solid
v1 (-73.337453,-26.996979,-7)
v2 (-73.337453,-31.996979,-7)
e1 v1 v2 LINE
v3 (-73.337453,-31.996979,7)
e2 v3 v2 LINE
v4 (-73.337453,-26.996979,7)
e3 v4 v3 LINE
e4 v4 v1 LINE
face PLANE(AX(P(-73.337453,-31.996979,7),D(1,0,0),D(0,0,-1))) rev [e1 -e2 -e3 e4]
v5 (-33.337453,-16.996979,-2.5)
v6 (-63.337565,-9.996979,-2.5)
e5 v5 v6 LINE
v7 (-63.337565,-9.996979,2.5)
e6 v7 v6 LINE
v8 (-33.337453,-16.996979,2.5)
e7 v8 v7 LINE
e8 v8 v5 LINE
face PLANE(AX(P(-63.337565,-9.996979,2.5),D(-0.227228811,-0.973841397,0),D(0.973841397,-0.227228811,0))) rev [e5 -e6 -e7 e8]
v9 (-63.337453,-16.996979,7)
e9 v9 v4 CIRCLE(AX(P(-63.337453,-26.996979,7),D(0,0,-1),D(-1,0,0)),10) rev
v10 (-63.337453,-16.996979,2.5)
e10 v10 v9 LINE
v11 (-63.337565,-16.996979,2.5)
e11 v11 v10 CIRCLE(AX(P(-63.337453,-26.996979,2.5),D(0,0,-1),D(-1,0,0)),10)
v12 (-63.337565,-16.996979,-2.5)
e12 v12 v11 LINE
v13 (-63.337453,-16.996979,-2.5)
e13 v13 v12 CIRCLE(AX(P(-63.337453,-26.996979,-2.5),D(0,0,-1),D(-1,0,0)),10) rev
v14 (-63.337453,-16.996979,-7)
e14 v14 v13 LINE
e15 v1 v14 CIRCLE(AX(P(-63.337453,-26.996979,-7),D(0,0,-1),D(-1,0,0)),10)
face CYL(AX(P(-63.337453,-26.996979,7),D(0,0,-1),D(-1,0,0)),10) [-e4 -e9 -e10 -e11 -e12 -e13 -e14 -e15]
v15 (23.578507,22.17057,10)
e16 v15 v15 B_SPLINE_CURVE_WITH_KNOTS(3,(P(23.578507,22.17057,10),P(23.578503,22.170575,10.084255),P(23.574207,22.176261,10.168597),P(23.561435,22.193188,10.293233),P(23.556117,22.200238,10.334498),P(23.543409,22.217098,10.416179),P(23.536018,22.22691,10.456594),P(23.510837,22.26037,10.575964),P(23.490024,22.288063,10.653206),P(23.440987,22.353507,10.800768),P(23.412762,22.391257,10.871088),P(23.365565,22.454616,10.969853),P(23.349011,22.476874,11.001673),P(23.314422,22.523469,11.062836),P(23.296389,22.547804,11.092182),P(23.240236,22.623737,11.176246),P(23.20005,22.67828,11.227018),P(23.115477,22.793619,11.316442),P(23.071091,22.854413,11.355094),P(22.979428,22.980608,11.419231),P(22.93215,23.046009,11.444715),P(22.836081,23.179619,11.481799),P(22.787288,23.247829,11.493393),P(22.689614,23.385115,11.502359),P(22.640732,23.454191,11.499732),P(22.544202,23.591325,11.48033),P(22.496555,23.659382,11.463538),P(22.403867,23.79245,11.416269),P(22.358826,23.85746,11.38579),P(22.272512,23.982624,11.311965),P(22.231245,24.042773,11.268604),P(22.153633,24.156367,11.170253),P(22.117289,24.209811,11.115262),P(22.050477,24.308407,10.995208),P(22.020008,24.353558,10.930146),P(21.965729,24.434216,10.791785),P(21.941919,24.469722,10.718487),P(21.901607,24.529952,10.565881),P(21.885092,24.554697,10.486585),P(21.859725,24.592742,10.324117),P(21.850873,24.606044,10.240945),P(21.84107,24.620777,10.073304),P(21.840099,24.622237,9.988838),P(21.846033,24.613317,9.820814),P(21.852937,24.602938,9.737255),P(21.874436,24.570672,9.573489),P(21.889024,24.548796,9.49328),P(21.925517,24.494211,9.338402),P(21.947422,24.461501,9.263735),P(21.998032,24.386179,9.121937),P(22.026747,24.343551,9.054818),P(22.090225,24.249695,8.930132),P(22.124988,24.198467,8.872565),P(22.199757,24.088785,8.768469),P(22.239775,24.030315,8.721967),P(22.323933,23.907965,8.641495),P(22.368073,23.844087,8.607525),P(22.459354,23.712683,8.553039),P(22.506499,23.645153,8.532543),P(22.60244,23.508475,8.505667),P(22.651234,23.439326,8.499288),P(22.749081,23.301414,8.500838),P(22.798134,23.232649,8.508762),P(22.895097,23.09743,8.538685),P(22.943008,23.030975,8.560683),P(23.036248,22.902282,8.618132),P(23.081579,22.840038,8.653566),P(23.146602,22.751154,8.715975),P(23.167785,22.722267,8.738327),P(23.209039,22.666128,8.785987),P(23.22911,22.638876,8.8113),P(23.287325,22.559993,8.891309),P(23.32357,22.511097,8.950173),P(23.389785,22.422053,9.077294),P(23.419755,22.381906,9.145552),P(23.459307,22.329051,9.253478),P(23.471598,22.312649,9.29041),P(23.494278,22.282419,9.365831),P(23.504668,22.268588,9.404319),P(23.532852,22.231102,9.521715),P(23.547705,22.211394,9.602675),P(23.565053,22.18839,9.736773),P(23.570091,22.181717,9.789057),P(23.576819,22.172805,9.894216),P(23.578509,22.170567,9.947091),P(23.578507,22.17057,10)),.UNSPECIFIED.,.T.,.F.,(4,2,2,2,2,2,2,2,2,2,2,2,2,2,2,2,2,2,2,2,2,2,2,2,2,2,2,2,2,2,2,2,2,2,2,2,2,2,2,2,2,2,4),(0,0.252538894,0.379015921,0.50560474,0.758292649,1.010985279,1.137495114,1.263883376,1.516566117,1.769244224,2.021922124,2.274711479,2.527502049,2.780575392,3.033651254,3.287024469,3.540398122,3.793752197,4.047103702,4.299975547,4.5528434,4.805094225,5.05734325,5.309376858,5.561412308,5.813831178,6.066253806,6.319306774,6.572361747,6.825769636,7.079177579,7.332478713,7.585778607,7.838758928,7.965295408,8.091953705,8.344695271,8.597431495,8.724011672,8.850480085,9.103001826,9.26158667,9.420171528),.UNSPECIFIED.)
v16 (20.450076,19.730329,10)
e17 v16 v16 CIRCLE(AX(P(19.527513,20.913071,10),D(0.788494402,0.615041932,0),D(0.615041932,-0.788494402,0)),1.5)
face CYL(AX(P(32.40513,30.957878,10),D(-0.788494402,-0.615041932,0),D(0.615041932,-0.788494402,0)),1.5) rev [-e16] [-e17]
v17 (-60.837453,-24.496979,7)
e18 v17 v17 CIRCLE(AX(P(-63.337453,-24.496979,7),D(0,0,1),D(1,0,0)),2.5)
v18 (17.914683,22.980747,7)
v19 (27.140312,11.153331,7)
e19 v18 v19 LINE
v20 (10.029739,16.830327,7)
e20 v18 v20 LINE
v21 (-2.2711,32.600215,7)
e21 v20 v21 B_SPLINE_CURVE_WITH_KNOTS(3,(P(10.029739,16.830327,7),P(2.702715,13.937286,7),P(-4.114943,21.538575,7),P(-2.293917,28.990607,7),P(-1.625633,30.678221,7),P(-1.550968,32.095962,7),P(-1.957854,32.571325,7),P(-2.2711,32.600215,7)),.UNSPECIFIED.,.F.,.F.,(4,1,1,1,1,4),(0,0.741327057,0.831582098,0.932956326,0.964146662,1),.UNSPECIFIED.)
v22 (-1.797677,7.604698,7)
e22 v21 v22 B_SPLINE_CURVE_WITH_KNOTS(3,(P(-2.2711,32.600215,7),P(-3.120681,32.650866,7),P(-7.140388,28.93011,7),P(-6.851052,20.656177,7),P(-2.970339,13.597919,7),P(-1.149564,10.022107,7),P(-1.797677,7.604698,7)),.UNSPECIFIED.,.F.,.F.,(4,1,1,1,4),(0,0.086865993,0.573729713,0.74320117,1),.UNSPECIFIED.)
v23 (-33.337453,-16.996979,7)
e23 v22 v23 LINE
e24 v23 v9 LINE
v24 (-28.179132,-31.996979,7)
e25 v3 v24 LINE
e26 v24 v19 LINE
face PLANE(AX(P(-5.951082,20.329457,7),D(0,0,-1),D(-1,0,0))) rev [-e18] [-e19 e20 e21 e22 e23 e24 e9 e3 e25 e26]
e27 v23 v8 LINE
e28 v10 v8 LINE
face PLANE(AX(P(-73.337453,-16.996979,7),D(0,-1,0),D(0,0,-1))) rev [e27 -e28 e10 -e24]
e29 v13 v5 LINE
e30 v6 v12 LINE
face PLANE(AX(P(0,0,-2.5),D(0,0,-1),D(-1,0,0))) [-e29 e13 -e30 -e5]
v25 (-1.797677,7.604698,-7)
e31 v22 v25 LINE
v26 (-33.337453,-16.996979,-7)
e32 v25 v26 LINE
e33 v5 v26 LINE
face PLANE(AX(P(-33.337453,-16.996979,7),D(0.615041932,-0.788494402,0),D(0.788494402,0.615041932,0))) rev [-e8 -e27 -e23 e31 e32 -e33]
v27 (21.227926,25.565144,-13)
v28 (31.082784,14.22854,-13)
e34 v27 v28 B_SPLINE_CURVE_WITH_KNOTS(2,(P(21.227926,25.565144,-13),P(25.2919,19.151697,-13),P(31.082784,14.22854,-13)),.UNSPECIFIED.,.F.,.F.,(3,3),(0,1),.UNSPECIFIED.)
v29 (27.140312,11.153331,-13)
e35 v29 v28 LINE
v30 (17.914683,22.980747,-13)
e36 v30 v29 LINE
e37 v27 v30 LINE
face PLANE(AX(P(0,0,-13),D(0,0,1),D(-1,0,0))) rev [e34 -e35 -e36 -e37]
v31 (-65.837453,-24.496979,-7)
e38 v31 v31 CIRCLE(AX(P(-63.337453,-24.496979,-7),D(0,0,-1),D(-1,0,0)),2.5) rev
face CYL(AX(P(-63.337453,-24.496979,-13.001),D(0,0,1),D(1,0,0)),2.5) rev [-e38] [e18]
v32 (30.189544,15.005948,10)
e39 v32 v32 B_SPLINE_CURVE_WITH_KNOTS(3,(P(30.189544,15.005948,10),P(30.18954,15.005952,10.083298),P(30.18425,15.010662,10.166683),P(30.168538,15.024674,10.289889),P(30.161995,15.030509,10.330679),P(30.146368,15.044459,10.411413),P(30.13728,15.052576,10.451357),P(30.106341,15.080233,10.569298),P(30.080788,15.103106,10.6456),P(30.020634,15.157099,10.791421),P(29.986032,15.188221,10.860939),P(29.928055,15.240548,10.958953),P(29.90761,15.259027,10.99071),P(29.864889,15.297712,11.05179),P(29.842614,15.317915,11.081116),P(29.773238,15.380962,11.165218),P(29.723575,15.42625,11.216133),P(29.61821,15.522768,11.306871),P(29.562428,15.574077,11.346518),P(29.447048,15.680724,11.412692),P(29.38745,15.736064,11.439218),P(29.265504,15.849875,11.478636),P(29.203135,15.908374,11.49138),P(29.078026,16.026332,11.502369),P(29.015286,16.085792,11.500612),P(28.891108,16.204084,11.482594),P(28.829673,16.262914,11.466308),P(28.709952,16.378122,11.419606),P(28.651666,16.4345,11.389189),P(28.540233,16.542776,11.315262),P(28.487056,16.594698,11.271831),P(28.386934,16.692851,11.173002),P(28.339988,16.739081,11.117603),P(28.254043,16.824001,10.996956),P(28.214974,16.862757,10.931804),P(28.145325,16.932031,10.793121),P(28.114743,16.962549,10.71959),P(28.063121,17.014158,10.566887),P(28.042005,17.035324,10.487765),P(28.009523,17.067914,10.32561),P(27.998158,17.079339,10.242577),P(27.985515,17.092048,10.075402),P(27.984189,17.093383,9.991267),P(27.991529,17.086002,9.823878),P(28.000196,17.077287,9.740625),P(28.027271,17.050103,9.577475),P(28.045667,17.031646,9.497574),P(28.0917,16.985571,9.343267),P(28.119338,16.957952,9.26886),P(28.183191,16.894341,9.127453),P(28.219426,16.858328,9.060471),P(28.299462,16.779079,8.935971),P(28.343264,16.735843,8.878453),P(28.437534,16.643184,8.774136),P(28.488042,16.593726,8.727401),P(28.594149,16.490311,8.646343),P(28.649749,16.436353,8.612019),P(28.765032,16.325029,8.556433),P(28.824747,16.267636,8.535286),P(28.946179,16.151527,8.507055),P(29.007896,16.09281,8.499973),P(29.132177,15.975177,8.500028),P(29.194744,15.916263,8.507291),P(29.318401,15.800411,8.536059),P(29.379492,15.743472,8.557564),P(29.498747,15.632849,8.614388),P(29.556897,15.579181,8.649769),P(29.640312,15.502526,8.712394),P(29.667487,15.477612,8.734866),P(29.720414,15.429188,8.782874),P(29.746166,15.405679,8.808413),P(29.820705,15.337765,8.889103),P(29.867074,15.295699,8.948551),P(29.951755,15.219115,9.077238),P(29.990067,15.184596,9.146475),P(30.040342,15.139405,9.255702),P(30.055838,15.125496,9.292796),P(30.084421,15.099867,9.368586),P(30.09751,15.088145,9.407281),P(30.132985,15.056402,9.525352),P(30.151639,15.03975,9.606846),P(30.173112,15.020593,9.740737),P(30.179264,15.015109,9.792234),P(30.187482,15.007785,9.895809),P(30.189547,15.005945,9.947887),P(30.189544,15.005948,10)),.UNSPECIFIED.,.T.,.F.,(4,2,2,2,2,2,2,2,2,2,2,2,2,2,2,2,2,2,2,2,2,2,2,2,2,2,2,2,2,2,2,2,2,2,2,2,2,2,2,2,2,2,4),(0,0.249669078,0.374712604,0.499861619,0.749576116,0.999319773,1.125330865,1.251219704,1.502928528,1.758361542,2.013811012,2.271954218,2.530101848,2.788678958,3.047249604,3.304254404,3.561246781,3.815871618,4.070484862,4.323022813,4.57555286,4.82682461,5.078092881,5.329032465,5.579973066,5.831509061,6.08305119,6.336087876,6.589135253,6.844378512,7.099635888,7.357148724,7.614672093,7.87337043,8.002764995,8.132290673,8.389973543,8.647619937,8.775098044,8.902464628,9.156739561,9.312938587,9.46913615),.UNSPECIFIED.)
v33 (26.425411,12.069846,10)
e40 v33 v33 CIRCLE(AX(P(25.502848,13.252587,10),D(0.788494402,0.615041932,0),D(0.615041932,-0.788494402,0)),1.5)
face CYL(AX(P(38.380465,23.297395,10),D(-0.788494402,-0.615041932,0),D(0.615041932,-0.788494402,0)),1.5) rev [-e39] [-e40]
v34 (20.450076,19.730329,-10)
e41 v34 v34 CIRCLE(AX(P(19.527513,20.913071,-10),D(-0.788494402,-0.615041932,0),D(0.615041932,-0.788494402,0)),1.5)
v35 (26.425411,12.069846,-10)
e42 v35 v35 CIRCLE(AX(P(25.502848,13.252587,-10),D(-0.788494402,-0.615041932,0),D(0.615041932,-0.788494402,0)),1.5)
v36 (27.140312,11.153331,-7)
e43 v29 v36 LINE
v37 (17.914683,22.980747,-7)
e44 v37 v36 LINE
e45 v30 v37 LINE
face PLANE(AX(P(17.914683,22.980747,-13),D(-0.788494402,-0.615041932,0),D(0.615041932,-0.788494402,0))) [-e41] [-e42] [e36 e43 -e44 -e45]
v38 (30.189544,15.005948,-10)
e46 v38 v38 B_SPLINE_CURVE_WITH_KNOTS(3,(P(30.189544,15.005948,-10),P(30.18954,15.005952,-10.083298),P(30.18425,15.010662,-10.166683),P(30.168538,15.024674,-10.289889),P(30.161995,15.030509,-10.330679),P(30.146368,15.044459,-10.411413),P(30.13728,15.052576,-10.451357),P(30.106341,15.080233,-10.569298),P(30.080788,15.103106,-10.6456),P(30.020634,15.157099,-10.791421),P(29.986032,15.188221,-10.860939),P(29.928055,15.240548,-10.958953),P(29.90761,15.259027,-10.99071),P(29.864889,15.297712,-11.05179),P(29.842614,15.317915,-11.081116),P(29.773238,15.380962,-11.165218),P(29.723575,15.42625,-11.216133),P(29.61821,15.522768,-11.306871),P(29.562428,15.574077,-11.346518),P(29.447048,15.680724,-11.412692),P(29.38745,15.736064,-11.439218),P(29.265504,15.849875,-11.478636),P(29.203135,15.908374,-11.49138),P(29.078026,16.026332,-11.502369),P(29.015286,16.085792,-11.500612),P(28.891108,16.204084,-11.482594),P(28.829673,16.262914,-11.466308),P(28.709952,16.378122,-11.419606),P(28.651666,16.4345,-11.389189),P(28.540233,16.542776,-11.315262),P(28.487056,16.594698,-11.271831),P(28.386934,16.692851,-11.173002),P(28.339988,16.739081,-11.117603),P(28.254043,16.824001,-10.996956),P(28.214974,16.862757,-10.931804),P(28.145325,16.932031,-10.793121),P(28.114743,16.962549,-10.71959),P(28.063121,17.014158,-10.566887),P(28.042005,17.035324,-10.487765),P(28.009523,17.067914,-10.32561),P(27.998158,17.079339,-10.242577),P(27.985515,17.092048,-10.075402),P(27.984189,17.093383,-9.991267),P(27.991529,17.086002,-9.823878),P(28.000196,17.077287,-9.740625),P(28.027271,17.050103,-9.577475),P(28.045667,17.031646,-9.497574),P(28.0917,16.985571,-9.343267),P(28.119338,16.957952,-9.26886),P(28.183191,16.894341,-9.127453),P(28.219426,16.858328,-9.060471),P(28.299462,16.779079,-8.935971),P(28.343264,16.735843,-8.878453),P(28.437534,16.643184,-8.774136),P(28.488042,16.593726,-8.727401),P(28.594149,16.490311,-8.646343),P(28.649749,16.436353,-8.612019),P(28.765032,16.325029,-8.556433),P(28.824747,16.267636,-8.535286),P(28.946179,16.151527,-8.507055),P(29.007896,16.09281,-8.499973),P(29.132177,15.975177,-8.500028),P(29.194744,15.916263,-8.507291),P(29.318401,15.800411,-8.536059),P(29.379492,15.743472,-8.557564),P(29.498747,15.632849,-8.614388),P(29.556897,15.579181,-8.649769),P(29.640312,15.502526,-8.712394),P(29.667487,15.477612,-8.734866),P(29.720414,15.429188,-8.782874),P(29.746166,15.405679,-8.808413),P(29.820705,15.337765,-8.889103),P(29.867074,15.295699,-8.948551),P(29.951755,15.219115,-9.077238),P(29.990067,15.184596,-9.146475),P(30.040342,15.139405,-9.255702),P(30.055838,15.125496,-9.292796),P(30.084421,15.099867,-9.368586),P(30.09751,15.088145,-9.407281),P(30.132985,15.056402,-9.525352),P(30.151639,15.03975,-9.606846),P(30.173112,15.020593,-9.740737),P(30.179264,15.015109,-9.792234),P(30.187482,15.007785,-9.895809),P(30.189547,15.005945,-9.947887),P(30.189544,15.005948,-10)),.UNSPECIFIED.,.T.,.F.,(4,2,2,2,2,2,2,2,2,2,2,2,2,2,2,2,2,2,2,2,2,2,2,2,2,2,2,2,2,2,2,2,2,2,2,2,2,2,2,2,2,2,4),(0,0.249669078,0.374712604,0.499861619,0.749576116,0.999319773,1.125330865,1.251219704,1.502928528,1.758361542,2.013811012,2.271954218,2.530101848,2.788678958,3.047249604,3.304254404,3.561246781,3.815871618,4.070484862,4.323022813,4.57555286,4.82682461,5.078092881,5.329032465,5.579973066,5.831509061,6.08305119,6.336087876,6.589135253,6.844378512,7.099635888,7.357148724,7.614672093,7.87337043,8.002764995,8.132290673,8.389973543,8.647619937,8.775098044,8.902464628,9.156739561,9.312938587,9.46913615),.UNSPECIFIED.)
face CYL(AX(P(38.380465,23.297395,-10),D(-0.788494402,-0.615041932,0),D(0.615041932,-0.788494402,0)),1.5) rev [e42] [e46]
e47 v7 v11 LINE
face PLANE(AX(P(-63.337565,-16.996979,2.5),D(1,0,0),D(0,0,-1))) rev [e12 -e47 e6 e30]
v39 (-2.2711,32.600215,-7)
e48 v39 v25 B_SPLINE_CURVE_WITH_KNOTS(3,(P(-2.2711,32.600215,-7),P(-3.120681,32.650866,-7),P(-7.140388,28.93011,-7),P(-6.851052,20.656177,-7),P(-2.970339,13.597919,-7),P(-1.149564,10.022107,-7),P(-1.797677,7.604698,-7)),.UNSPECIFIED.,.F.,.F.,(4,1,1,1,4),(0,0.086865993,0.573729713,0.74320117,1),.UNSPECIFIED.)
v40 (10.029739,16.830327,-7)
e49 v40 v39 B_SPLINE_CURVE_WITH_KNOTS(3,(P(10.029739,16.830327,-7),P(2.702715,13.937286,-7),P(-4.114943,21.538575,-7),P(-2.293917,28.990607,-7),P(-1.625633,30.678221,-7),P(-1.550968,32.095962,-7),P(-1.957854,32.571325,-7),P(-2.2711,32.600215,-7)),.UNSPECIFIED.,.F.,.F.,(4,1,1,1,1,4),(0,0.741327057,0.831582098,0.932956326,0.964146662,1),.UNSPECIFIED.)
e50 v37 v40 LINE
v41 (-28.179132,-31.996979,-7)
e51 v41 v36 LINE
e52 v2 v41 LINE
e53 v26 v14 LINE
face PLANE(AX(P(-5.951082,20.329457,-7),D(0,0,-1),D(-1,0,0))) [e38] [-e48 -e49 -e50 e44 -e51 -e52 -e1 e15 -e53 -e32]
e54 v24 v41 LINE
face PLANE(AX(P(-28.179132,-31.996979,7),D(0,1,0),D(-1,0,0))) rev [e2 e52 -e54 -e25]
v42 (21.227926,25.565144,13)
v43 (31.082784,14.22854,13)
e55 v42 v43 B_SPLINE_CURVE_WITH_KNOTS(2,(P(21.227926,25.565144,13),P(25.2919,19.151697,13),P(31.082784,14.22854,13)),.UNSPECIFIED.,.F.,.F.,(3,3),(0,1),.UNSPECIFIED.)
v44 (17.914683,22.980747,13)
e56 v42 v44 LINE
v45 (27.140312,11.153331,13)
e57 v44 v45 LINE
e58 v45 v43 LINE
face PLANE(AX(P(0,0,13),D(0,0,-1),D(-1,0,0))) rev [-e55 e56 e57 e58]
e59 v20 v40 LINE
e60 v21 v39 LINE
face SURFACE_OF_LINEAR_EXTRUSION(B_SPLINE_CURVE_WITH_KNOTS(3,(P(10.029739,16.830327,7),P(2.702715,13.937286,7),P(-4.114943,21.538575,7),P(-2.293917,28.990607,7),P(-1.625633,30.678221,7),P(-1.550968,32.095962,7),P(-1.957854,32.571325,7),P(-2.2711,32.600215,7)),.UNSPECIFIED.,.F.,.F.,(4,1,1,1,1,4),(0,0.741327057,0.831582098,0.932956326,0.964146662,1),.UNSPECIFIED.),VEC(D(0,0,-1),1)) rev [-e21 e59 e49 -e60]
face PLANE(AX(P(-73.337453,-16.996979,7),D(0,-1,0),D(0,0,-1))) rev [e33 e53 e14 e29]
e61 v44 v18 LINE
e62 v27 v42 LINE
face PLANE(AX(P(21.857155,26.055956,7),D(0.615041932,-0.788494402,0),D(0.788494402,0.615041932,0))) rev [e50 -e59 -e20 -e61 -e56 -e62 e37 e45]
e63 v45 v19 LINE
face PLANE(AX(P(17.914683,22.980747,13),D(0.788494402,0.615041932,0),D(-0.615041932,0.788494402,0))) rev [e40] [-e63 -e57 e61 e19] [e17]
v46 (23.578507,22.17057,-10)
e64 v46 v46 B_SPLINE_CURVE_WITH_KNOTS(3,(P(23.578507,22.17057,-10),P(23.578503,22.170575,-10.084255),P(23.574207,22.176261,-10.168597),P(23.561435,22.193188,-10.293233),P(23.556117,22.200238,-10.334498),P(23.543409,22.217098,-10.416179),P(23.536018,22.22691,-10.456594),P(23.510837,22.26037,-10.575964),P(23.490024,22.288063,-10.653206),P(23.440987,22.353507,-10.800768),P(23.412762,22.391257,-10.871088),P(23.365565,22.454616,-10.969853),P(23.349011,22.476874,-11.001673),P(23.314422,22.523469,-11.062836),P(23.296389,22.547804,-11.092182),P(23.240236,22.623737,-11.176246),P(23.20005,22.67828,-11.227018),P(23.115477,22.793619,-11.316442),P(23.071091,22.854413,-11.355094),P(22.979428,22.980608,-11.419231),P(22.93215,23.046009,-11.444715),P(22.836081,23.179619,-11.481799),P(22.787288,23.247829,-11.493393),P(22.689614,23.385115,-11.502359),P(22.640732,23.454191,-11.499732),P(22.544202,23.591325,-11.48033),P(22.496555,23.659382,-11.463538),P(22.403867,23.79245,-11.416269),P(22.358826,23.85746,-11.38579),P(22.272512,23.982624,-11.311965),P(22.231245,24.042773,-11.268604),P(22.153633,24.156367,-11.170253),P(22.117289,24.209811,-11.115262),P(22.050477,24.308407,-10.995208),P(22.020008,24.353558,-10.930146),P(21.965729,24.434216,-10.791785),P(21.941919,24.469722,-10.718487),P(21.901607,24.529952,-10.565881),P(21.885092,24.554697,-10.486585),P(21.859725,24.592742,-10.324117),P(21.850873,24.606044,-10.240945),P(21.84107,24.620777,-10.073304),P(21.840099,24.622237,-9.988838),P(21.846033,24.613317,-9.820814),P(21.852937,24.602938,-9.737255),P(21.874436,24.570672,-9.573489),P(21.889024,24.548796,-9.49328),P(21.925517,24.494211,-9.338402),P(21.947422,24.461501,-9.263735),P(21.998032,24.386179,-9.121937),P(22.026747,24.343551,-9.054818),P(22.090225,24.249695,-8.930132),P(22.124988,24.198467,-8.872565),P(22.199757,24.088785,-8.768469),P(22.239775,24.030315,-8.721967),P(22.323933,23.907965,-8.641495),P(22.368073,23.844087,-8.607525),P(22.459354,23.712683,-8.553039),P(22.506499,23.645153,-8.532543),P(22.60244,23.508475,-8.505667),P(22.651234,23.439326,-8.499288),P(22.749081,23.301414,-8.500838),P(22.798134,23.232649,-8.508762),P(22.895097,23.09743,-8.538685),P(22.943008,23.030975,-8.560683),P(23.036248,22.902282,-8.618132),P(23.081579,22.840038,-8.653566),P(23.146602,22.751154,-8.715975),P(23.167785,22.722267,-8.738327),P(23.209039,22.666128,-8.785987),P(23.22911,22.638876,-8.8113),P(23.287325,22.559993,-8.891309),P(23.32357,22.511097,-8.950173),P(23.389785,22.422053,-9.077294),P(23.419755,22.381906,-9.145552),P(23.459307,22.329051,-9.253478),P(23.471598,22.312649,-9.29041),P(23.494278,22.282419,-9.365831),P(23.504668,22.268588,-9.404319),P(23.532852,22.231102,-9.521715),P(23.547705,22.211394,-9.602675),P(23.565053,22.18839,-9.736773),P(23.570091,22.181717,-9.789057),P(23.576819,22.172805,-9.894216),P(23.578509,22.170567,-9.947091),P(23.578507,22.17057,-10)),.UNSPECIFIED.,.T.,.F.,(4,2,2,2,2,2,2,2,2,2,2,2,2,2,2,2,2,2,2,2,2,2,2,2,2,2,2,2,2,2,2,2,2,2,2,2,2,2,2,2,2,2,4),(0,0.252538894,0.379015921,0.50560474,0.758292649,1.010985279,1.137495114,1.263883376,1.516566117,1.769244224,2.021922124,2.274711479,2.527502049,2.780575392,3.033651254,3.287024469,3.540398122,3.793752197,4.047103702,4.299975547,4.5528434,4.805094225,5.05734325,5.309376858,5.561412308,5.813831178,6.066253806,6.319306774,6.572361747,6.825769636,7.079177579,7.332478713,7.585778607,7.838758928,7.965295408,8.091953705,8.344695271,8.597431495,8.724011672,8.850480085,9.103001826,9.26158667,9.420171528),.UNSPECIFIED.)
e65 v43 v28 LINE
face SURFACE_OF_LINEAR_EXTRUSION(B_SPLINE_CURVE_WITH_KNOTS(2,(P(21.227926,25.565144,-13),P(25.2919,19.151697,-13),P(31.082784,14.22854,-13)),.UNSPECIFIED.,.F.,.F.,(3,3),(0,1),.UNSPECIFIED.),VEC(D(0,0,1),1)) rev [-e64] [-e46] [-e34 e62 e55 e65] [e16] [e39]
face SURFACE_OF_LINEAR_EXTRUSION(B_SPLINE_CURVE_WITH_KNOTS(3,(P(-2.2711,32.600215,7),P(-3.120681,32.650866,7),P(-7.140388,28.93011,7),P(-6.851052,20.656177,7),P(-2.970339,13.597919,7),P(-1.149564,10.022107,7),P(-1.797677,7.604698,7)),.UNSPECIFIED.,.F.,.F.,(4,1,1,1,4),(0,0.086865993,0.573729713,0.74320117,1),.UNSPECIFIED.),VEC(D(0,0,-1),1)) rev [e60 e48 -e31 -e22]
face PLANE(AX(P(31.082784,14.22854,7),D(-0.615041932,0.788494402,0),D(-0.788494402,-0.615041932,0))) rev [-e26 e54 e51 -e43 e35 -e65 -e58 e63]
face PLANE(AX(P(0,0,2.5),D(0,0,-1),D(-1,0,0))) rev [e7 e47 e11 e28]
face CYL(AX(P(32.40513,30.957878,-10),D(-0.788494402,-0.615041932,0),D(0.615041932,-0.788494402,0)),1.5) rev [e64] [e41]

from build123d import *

# Parameters (mm, degrees)
SALIENTE_EXTRUIR1_DEPTH = 7
CROQUIS2_R              = 2.5
CORTAR_EXTRUIR1_DEPTH   = 40
SALIENTE_EXTRUIR2_DEPTH = 6
CORTAR_EXTRUIR2_DEPTH   = 85.364465566
CROQUIS6_R              = 1.5
CORTAR_EXTRUIR3_DEPTH   = 109.399183933
SALIENTE_EXTRUIR3_DEPTH = 2.5
CORTAR_EXTRUIR4_REACH   = 110.399
CROQUIS8_R              = 1.5
CORTAR_EXTRUIR5_REACH   = 84.713
CROQUIS9_R              = 2.5
REDONDEO1_R             = 10


with BuildPart() as part:
    # Croquis1 → Saliente-Extruir1 (new, symmetric)
    with BuildSketch(Plane.XY):
        with BuildLine():
            Line((-73.337453264, -31.996979), (-73.337453264, -16.996979))
            Line((-73.337453264, -16.996979), (-53.337453264, -16.996979))
            Line((-53.337453264, -16.996979), (-33.337453264, -16.996979))
            Line((-33.337453264, -16.996979), (-1.797677202, 7.604698299))
            add(Edge.make_bspline(
                [(-2.271099828, 32.600215317), (-3.120681365, 32.65086638), (-7.140387905, 28.930110418), (-6.851052057, 20.6561771), (-2.970338985, 13.597919356), (-1.149563969, 10.022107474), (-1.797677202, 7.604698299)],
                knots=[0, 0, 0, 0, 0.086865993, 0.573729713, 0.74320117, 1, 1, 1, 1], degree=3))
            add(Edge.make_bspline(
                [(-2.271099828, 32.600215317), (-1.957854214, 32.571324686), (-1.550967765, 32.095962064), (-1.625633045, 30.678221383), (-2.293917384, 28.99060688), (-4.114943029, 21.538574705), (2.702714569, 13.937286445), (10.029738822, 16.830327286)],
                knots=[0, 0, 0, 0, 0.035853338, 0.067043674, 0.168417902, 0.258672943, 1, 1, 1, 1], degree=3))
            Line((10.029738822, 16.830327286), (21.857154848, 26.05595627))
            Line((21.857154848, 26.05595627), (31.082783835, 14.228540246))
            Line((31.082783835, 14.228540246), (-28.179131834, -31.996979))
            Line((-28.179131834, -31.996979), (-73.337453264, -31.996979))
        make_face()
    extrude(amount=SALIENTE_EXTRUIR1_DEPTH, both=True)

    # Croquis2 → Cortar-Extruir1 (cut)
    with BuildSketch(Plane.XY.offset(7)):
        with Locations((-63.337453264, -12.196140351)):
            Circle(CROQUIS2_R)
    extrude(amount=-CORTAR_EXTRUIR1_DEPTH, mode=Mode.SUBTRACT)

    # Croquis4 → Saliente-Extruir2 (add)
    with BuildSketch(Plane.XY.offset(7)):
        Polygon((21.857154848, 26.05595627), (17.914682839, 22.980746608), (27.140311824, 11.153330581), (31.082783835, 14.228540246), align=None)
    saliente_extruir2 = extrude(amount=SALIENTE_EXTRUIR2_DEPTH)

    # Simetría1: Saliente-Extruir2 across plane
    add(saliente_extruir2.mirror(Plane.XY))

    # Croquis5 → Cortar-Extruir2 (cut, through all)
    with BuildSketch(Plane.XY.offset(13)):
        with BuildLine():
            Line((21.227925662, 25.565144498), (21.857154848, 26.05595627))
            Line((21.857154848, 26.05595627), (31.082783835, 14.228540246))
            add(Edge.make_bspline(
                [(31.082783835, 14.228540246), (25.291900343, 19.151696697), (21.227925662, 25.565144498)],
                knots=[0, 0, 0, 1, 1, 1], degree=2))
        make_face()
    extrude(amount=-CORTAR_EXTRUIR2_DEPTH, mode=Mode.SUBTRACT)

    # Croquis6 → Cortar-Extruir3 (cut, through all)
    with BuildSketch(Plane(origin=(22.282654611, 17.3809312, 0), x_dir=(0, 0, 1), z_dir=(-0.7884944017253559, -0.6150419322678522, 0))):
        with Locations((-20.725956244, 4.101908899)):
            Circle(CROQUIS6_R)
        with Locations((-20.725956244, -4.898091102)):
            Circle(CROQUIS6_R)
    cortar_extruir3 = extrude(amount=-CORTAR_EXTRUIR3_DEPTH, mode=Mode.SUBTRACT)

    # Simetría2: Cortar-Extruir3 across plane
    add(cortar_extruir3.mirror(Plane.XY), mode=Mode.SUBTRACT)

    # Croquis7 → Saliente-Extruir3 (add, symmetric)
    with BuildSketch(Plane.XY):
        Polygon((-33.337453264, -16.996979), (-47.567565233, -16.996979), (-63.337565233, -16.996979), (-63.337565233, -9.996979), align=None)
    extrude(amount=SALIENTE_EXTRUIR3_DEPTH, both=True)

    # Croquis8 → Cortar-Extruir4 (cut, up to next)
    with BuildSketch(Plane(origin=(22.282654611, 17.3809312, 0), x_dir=(0, 0, 1), z_dir=(-0.7884944017253558, -0.6150419322678521, 0)), mode=Mode.PRIVATE) as cortar_extruir4_sk1:
        with Locations(Location((-10, 4.479600053, 0), (0, 0, 270))):
            Circle(CROQUIS8_R)
    cortar_extruir4_tool1 = extrude(cortar_extruir4_sk1.sketch, amount=-CORTAR_EXTRUIR4_REACH, mode=Mode.PRIVATE) & part.part
    # Croquis8 → Cortar-Extruir4 (cut, up to next)
    with BuildSketch(Plane(origin=(22.282654611, 17.3809312, 0), x_dir=(0, 0, 1), z_dir=(-0.7884944017253558, -0.6150419322678521, 0)), mode=Mode.PRIVATE) as cortar_extruir4_sk2:
        with Locations(Location((-10, -5.235729918, 0), (0, 0, 270))):
            Circle(CROQUIS8_R)
    cortar_extruir4_tool2 = extrude(cortar_extruir4_sk2.sketch, amount=-CORTAR_EXTRUIR4_REACH, mode=Mode.PRIVATE) & part.part
    cortar_extruir4_1 = cortar_extruir4_tool1.solids().sort_by_distance((19.527513, 20.913071, -10))[0]
    add(cortar_extruir4_1, mode=Mode.SUBTRACT)
    cortar_extruir4_2 = cortar_extruir4_tool2.solids().sort_by_distance((25.502848, 13.252587, -10))[0]
    add(cortar_extruir4_2, mode=Mode.SUBTRACT)
    cortar_extruir4 = cortar_extruir4_1 + cortar_extruir4_2  # Cortar-Extruir4 as one shape, for the pattern or mirror that repeats it

    # Simetría3: Cortar-Extruir4 across plane
    add(cortar_extruir4.mirror(Plane.XY), mode=Mode.SUBTRACT)

    # Croquis9 → Cortar-Extruir5 (cut, up to next)
    with BuildSketch(Plane.XY.offset(7), mode=Mode.PRIVATE) as cortar_extruir5_sk1:
        with Locations((-63.337453264, -24.496979)):
            Circle(CROQUIS9_R)
    cortar_extruir5_tool1 = extrude(cortar_extruir5_sk1.sketch, amount=-CORTAR_EXTRUIR5_REACH, mode=Mode.PRIVATE) & part.part
    add(cortar_extruir5_tool1.solids().sort_by_distance((-63.337453, -24.496979, 7))[0], mode=Mode.SUBTRACT)

    # Redondeo1
    # the kernel refuses this fillet: 10 mm, written as the material it takes off along each edge
    with BuildSketch(Plane(origin=(-73.337453264, -16.996979, 32), x_dir=(0, -1, 0), z_dir=(0, 0, -1))) as redondeo1_piece_1:
        with BuildLine():
            CenterArc((REDONDEO1_R, -REDONDEO1_R), REDONDEO1_R, 90, 90)
            Line((0, -REDONDEO1_R), (0, 0))
            Line((0, 0), (REDONDEO1_R, 0))
        make_face()
    extrude(amount=64, mode=Mode.SUBTRACT)


solid = part.part
